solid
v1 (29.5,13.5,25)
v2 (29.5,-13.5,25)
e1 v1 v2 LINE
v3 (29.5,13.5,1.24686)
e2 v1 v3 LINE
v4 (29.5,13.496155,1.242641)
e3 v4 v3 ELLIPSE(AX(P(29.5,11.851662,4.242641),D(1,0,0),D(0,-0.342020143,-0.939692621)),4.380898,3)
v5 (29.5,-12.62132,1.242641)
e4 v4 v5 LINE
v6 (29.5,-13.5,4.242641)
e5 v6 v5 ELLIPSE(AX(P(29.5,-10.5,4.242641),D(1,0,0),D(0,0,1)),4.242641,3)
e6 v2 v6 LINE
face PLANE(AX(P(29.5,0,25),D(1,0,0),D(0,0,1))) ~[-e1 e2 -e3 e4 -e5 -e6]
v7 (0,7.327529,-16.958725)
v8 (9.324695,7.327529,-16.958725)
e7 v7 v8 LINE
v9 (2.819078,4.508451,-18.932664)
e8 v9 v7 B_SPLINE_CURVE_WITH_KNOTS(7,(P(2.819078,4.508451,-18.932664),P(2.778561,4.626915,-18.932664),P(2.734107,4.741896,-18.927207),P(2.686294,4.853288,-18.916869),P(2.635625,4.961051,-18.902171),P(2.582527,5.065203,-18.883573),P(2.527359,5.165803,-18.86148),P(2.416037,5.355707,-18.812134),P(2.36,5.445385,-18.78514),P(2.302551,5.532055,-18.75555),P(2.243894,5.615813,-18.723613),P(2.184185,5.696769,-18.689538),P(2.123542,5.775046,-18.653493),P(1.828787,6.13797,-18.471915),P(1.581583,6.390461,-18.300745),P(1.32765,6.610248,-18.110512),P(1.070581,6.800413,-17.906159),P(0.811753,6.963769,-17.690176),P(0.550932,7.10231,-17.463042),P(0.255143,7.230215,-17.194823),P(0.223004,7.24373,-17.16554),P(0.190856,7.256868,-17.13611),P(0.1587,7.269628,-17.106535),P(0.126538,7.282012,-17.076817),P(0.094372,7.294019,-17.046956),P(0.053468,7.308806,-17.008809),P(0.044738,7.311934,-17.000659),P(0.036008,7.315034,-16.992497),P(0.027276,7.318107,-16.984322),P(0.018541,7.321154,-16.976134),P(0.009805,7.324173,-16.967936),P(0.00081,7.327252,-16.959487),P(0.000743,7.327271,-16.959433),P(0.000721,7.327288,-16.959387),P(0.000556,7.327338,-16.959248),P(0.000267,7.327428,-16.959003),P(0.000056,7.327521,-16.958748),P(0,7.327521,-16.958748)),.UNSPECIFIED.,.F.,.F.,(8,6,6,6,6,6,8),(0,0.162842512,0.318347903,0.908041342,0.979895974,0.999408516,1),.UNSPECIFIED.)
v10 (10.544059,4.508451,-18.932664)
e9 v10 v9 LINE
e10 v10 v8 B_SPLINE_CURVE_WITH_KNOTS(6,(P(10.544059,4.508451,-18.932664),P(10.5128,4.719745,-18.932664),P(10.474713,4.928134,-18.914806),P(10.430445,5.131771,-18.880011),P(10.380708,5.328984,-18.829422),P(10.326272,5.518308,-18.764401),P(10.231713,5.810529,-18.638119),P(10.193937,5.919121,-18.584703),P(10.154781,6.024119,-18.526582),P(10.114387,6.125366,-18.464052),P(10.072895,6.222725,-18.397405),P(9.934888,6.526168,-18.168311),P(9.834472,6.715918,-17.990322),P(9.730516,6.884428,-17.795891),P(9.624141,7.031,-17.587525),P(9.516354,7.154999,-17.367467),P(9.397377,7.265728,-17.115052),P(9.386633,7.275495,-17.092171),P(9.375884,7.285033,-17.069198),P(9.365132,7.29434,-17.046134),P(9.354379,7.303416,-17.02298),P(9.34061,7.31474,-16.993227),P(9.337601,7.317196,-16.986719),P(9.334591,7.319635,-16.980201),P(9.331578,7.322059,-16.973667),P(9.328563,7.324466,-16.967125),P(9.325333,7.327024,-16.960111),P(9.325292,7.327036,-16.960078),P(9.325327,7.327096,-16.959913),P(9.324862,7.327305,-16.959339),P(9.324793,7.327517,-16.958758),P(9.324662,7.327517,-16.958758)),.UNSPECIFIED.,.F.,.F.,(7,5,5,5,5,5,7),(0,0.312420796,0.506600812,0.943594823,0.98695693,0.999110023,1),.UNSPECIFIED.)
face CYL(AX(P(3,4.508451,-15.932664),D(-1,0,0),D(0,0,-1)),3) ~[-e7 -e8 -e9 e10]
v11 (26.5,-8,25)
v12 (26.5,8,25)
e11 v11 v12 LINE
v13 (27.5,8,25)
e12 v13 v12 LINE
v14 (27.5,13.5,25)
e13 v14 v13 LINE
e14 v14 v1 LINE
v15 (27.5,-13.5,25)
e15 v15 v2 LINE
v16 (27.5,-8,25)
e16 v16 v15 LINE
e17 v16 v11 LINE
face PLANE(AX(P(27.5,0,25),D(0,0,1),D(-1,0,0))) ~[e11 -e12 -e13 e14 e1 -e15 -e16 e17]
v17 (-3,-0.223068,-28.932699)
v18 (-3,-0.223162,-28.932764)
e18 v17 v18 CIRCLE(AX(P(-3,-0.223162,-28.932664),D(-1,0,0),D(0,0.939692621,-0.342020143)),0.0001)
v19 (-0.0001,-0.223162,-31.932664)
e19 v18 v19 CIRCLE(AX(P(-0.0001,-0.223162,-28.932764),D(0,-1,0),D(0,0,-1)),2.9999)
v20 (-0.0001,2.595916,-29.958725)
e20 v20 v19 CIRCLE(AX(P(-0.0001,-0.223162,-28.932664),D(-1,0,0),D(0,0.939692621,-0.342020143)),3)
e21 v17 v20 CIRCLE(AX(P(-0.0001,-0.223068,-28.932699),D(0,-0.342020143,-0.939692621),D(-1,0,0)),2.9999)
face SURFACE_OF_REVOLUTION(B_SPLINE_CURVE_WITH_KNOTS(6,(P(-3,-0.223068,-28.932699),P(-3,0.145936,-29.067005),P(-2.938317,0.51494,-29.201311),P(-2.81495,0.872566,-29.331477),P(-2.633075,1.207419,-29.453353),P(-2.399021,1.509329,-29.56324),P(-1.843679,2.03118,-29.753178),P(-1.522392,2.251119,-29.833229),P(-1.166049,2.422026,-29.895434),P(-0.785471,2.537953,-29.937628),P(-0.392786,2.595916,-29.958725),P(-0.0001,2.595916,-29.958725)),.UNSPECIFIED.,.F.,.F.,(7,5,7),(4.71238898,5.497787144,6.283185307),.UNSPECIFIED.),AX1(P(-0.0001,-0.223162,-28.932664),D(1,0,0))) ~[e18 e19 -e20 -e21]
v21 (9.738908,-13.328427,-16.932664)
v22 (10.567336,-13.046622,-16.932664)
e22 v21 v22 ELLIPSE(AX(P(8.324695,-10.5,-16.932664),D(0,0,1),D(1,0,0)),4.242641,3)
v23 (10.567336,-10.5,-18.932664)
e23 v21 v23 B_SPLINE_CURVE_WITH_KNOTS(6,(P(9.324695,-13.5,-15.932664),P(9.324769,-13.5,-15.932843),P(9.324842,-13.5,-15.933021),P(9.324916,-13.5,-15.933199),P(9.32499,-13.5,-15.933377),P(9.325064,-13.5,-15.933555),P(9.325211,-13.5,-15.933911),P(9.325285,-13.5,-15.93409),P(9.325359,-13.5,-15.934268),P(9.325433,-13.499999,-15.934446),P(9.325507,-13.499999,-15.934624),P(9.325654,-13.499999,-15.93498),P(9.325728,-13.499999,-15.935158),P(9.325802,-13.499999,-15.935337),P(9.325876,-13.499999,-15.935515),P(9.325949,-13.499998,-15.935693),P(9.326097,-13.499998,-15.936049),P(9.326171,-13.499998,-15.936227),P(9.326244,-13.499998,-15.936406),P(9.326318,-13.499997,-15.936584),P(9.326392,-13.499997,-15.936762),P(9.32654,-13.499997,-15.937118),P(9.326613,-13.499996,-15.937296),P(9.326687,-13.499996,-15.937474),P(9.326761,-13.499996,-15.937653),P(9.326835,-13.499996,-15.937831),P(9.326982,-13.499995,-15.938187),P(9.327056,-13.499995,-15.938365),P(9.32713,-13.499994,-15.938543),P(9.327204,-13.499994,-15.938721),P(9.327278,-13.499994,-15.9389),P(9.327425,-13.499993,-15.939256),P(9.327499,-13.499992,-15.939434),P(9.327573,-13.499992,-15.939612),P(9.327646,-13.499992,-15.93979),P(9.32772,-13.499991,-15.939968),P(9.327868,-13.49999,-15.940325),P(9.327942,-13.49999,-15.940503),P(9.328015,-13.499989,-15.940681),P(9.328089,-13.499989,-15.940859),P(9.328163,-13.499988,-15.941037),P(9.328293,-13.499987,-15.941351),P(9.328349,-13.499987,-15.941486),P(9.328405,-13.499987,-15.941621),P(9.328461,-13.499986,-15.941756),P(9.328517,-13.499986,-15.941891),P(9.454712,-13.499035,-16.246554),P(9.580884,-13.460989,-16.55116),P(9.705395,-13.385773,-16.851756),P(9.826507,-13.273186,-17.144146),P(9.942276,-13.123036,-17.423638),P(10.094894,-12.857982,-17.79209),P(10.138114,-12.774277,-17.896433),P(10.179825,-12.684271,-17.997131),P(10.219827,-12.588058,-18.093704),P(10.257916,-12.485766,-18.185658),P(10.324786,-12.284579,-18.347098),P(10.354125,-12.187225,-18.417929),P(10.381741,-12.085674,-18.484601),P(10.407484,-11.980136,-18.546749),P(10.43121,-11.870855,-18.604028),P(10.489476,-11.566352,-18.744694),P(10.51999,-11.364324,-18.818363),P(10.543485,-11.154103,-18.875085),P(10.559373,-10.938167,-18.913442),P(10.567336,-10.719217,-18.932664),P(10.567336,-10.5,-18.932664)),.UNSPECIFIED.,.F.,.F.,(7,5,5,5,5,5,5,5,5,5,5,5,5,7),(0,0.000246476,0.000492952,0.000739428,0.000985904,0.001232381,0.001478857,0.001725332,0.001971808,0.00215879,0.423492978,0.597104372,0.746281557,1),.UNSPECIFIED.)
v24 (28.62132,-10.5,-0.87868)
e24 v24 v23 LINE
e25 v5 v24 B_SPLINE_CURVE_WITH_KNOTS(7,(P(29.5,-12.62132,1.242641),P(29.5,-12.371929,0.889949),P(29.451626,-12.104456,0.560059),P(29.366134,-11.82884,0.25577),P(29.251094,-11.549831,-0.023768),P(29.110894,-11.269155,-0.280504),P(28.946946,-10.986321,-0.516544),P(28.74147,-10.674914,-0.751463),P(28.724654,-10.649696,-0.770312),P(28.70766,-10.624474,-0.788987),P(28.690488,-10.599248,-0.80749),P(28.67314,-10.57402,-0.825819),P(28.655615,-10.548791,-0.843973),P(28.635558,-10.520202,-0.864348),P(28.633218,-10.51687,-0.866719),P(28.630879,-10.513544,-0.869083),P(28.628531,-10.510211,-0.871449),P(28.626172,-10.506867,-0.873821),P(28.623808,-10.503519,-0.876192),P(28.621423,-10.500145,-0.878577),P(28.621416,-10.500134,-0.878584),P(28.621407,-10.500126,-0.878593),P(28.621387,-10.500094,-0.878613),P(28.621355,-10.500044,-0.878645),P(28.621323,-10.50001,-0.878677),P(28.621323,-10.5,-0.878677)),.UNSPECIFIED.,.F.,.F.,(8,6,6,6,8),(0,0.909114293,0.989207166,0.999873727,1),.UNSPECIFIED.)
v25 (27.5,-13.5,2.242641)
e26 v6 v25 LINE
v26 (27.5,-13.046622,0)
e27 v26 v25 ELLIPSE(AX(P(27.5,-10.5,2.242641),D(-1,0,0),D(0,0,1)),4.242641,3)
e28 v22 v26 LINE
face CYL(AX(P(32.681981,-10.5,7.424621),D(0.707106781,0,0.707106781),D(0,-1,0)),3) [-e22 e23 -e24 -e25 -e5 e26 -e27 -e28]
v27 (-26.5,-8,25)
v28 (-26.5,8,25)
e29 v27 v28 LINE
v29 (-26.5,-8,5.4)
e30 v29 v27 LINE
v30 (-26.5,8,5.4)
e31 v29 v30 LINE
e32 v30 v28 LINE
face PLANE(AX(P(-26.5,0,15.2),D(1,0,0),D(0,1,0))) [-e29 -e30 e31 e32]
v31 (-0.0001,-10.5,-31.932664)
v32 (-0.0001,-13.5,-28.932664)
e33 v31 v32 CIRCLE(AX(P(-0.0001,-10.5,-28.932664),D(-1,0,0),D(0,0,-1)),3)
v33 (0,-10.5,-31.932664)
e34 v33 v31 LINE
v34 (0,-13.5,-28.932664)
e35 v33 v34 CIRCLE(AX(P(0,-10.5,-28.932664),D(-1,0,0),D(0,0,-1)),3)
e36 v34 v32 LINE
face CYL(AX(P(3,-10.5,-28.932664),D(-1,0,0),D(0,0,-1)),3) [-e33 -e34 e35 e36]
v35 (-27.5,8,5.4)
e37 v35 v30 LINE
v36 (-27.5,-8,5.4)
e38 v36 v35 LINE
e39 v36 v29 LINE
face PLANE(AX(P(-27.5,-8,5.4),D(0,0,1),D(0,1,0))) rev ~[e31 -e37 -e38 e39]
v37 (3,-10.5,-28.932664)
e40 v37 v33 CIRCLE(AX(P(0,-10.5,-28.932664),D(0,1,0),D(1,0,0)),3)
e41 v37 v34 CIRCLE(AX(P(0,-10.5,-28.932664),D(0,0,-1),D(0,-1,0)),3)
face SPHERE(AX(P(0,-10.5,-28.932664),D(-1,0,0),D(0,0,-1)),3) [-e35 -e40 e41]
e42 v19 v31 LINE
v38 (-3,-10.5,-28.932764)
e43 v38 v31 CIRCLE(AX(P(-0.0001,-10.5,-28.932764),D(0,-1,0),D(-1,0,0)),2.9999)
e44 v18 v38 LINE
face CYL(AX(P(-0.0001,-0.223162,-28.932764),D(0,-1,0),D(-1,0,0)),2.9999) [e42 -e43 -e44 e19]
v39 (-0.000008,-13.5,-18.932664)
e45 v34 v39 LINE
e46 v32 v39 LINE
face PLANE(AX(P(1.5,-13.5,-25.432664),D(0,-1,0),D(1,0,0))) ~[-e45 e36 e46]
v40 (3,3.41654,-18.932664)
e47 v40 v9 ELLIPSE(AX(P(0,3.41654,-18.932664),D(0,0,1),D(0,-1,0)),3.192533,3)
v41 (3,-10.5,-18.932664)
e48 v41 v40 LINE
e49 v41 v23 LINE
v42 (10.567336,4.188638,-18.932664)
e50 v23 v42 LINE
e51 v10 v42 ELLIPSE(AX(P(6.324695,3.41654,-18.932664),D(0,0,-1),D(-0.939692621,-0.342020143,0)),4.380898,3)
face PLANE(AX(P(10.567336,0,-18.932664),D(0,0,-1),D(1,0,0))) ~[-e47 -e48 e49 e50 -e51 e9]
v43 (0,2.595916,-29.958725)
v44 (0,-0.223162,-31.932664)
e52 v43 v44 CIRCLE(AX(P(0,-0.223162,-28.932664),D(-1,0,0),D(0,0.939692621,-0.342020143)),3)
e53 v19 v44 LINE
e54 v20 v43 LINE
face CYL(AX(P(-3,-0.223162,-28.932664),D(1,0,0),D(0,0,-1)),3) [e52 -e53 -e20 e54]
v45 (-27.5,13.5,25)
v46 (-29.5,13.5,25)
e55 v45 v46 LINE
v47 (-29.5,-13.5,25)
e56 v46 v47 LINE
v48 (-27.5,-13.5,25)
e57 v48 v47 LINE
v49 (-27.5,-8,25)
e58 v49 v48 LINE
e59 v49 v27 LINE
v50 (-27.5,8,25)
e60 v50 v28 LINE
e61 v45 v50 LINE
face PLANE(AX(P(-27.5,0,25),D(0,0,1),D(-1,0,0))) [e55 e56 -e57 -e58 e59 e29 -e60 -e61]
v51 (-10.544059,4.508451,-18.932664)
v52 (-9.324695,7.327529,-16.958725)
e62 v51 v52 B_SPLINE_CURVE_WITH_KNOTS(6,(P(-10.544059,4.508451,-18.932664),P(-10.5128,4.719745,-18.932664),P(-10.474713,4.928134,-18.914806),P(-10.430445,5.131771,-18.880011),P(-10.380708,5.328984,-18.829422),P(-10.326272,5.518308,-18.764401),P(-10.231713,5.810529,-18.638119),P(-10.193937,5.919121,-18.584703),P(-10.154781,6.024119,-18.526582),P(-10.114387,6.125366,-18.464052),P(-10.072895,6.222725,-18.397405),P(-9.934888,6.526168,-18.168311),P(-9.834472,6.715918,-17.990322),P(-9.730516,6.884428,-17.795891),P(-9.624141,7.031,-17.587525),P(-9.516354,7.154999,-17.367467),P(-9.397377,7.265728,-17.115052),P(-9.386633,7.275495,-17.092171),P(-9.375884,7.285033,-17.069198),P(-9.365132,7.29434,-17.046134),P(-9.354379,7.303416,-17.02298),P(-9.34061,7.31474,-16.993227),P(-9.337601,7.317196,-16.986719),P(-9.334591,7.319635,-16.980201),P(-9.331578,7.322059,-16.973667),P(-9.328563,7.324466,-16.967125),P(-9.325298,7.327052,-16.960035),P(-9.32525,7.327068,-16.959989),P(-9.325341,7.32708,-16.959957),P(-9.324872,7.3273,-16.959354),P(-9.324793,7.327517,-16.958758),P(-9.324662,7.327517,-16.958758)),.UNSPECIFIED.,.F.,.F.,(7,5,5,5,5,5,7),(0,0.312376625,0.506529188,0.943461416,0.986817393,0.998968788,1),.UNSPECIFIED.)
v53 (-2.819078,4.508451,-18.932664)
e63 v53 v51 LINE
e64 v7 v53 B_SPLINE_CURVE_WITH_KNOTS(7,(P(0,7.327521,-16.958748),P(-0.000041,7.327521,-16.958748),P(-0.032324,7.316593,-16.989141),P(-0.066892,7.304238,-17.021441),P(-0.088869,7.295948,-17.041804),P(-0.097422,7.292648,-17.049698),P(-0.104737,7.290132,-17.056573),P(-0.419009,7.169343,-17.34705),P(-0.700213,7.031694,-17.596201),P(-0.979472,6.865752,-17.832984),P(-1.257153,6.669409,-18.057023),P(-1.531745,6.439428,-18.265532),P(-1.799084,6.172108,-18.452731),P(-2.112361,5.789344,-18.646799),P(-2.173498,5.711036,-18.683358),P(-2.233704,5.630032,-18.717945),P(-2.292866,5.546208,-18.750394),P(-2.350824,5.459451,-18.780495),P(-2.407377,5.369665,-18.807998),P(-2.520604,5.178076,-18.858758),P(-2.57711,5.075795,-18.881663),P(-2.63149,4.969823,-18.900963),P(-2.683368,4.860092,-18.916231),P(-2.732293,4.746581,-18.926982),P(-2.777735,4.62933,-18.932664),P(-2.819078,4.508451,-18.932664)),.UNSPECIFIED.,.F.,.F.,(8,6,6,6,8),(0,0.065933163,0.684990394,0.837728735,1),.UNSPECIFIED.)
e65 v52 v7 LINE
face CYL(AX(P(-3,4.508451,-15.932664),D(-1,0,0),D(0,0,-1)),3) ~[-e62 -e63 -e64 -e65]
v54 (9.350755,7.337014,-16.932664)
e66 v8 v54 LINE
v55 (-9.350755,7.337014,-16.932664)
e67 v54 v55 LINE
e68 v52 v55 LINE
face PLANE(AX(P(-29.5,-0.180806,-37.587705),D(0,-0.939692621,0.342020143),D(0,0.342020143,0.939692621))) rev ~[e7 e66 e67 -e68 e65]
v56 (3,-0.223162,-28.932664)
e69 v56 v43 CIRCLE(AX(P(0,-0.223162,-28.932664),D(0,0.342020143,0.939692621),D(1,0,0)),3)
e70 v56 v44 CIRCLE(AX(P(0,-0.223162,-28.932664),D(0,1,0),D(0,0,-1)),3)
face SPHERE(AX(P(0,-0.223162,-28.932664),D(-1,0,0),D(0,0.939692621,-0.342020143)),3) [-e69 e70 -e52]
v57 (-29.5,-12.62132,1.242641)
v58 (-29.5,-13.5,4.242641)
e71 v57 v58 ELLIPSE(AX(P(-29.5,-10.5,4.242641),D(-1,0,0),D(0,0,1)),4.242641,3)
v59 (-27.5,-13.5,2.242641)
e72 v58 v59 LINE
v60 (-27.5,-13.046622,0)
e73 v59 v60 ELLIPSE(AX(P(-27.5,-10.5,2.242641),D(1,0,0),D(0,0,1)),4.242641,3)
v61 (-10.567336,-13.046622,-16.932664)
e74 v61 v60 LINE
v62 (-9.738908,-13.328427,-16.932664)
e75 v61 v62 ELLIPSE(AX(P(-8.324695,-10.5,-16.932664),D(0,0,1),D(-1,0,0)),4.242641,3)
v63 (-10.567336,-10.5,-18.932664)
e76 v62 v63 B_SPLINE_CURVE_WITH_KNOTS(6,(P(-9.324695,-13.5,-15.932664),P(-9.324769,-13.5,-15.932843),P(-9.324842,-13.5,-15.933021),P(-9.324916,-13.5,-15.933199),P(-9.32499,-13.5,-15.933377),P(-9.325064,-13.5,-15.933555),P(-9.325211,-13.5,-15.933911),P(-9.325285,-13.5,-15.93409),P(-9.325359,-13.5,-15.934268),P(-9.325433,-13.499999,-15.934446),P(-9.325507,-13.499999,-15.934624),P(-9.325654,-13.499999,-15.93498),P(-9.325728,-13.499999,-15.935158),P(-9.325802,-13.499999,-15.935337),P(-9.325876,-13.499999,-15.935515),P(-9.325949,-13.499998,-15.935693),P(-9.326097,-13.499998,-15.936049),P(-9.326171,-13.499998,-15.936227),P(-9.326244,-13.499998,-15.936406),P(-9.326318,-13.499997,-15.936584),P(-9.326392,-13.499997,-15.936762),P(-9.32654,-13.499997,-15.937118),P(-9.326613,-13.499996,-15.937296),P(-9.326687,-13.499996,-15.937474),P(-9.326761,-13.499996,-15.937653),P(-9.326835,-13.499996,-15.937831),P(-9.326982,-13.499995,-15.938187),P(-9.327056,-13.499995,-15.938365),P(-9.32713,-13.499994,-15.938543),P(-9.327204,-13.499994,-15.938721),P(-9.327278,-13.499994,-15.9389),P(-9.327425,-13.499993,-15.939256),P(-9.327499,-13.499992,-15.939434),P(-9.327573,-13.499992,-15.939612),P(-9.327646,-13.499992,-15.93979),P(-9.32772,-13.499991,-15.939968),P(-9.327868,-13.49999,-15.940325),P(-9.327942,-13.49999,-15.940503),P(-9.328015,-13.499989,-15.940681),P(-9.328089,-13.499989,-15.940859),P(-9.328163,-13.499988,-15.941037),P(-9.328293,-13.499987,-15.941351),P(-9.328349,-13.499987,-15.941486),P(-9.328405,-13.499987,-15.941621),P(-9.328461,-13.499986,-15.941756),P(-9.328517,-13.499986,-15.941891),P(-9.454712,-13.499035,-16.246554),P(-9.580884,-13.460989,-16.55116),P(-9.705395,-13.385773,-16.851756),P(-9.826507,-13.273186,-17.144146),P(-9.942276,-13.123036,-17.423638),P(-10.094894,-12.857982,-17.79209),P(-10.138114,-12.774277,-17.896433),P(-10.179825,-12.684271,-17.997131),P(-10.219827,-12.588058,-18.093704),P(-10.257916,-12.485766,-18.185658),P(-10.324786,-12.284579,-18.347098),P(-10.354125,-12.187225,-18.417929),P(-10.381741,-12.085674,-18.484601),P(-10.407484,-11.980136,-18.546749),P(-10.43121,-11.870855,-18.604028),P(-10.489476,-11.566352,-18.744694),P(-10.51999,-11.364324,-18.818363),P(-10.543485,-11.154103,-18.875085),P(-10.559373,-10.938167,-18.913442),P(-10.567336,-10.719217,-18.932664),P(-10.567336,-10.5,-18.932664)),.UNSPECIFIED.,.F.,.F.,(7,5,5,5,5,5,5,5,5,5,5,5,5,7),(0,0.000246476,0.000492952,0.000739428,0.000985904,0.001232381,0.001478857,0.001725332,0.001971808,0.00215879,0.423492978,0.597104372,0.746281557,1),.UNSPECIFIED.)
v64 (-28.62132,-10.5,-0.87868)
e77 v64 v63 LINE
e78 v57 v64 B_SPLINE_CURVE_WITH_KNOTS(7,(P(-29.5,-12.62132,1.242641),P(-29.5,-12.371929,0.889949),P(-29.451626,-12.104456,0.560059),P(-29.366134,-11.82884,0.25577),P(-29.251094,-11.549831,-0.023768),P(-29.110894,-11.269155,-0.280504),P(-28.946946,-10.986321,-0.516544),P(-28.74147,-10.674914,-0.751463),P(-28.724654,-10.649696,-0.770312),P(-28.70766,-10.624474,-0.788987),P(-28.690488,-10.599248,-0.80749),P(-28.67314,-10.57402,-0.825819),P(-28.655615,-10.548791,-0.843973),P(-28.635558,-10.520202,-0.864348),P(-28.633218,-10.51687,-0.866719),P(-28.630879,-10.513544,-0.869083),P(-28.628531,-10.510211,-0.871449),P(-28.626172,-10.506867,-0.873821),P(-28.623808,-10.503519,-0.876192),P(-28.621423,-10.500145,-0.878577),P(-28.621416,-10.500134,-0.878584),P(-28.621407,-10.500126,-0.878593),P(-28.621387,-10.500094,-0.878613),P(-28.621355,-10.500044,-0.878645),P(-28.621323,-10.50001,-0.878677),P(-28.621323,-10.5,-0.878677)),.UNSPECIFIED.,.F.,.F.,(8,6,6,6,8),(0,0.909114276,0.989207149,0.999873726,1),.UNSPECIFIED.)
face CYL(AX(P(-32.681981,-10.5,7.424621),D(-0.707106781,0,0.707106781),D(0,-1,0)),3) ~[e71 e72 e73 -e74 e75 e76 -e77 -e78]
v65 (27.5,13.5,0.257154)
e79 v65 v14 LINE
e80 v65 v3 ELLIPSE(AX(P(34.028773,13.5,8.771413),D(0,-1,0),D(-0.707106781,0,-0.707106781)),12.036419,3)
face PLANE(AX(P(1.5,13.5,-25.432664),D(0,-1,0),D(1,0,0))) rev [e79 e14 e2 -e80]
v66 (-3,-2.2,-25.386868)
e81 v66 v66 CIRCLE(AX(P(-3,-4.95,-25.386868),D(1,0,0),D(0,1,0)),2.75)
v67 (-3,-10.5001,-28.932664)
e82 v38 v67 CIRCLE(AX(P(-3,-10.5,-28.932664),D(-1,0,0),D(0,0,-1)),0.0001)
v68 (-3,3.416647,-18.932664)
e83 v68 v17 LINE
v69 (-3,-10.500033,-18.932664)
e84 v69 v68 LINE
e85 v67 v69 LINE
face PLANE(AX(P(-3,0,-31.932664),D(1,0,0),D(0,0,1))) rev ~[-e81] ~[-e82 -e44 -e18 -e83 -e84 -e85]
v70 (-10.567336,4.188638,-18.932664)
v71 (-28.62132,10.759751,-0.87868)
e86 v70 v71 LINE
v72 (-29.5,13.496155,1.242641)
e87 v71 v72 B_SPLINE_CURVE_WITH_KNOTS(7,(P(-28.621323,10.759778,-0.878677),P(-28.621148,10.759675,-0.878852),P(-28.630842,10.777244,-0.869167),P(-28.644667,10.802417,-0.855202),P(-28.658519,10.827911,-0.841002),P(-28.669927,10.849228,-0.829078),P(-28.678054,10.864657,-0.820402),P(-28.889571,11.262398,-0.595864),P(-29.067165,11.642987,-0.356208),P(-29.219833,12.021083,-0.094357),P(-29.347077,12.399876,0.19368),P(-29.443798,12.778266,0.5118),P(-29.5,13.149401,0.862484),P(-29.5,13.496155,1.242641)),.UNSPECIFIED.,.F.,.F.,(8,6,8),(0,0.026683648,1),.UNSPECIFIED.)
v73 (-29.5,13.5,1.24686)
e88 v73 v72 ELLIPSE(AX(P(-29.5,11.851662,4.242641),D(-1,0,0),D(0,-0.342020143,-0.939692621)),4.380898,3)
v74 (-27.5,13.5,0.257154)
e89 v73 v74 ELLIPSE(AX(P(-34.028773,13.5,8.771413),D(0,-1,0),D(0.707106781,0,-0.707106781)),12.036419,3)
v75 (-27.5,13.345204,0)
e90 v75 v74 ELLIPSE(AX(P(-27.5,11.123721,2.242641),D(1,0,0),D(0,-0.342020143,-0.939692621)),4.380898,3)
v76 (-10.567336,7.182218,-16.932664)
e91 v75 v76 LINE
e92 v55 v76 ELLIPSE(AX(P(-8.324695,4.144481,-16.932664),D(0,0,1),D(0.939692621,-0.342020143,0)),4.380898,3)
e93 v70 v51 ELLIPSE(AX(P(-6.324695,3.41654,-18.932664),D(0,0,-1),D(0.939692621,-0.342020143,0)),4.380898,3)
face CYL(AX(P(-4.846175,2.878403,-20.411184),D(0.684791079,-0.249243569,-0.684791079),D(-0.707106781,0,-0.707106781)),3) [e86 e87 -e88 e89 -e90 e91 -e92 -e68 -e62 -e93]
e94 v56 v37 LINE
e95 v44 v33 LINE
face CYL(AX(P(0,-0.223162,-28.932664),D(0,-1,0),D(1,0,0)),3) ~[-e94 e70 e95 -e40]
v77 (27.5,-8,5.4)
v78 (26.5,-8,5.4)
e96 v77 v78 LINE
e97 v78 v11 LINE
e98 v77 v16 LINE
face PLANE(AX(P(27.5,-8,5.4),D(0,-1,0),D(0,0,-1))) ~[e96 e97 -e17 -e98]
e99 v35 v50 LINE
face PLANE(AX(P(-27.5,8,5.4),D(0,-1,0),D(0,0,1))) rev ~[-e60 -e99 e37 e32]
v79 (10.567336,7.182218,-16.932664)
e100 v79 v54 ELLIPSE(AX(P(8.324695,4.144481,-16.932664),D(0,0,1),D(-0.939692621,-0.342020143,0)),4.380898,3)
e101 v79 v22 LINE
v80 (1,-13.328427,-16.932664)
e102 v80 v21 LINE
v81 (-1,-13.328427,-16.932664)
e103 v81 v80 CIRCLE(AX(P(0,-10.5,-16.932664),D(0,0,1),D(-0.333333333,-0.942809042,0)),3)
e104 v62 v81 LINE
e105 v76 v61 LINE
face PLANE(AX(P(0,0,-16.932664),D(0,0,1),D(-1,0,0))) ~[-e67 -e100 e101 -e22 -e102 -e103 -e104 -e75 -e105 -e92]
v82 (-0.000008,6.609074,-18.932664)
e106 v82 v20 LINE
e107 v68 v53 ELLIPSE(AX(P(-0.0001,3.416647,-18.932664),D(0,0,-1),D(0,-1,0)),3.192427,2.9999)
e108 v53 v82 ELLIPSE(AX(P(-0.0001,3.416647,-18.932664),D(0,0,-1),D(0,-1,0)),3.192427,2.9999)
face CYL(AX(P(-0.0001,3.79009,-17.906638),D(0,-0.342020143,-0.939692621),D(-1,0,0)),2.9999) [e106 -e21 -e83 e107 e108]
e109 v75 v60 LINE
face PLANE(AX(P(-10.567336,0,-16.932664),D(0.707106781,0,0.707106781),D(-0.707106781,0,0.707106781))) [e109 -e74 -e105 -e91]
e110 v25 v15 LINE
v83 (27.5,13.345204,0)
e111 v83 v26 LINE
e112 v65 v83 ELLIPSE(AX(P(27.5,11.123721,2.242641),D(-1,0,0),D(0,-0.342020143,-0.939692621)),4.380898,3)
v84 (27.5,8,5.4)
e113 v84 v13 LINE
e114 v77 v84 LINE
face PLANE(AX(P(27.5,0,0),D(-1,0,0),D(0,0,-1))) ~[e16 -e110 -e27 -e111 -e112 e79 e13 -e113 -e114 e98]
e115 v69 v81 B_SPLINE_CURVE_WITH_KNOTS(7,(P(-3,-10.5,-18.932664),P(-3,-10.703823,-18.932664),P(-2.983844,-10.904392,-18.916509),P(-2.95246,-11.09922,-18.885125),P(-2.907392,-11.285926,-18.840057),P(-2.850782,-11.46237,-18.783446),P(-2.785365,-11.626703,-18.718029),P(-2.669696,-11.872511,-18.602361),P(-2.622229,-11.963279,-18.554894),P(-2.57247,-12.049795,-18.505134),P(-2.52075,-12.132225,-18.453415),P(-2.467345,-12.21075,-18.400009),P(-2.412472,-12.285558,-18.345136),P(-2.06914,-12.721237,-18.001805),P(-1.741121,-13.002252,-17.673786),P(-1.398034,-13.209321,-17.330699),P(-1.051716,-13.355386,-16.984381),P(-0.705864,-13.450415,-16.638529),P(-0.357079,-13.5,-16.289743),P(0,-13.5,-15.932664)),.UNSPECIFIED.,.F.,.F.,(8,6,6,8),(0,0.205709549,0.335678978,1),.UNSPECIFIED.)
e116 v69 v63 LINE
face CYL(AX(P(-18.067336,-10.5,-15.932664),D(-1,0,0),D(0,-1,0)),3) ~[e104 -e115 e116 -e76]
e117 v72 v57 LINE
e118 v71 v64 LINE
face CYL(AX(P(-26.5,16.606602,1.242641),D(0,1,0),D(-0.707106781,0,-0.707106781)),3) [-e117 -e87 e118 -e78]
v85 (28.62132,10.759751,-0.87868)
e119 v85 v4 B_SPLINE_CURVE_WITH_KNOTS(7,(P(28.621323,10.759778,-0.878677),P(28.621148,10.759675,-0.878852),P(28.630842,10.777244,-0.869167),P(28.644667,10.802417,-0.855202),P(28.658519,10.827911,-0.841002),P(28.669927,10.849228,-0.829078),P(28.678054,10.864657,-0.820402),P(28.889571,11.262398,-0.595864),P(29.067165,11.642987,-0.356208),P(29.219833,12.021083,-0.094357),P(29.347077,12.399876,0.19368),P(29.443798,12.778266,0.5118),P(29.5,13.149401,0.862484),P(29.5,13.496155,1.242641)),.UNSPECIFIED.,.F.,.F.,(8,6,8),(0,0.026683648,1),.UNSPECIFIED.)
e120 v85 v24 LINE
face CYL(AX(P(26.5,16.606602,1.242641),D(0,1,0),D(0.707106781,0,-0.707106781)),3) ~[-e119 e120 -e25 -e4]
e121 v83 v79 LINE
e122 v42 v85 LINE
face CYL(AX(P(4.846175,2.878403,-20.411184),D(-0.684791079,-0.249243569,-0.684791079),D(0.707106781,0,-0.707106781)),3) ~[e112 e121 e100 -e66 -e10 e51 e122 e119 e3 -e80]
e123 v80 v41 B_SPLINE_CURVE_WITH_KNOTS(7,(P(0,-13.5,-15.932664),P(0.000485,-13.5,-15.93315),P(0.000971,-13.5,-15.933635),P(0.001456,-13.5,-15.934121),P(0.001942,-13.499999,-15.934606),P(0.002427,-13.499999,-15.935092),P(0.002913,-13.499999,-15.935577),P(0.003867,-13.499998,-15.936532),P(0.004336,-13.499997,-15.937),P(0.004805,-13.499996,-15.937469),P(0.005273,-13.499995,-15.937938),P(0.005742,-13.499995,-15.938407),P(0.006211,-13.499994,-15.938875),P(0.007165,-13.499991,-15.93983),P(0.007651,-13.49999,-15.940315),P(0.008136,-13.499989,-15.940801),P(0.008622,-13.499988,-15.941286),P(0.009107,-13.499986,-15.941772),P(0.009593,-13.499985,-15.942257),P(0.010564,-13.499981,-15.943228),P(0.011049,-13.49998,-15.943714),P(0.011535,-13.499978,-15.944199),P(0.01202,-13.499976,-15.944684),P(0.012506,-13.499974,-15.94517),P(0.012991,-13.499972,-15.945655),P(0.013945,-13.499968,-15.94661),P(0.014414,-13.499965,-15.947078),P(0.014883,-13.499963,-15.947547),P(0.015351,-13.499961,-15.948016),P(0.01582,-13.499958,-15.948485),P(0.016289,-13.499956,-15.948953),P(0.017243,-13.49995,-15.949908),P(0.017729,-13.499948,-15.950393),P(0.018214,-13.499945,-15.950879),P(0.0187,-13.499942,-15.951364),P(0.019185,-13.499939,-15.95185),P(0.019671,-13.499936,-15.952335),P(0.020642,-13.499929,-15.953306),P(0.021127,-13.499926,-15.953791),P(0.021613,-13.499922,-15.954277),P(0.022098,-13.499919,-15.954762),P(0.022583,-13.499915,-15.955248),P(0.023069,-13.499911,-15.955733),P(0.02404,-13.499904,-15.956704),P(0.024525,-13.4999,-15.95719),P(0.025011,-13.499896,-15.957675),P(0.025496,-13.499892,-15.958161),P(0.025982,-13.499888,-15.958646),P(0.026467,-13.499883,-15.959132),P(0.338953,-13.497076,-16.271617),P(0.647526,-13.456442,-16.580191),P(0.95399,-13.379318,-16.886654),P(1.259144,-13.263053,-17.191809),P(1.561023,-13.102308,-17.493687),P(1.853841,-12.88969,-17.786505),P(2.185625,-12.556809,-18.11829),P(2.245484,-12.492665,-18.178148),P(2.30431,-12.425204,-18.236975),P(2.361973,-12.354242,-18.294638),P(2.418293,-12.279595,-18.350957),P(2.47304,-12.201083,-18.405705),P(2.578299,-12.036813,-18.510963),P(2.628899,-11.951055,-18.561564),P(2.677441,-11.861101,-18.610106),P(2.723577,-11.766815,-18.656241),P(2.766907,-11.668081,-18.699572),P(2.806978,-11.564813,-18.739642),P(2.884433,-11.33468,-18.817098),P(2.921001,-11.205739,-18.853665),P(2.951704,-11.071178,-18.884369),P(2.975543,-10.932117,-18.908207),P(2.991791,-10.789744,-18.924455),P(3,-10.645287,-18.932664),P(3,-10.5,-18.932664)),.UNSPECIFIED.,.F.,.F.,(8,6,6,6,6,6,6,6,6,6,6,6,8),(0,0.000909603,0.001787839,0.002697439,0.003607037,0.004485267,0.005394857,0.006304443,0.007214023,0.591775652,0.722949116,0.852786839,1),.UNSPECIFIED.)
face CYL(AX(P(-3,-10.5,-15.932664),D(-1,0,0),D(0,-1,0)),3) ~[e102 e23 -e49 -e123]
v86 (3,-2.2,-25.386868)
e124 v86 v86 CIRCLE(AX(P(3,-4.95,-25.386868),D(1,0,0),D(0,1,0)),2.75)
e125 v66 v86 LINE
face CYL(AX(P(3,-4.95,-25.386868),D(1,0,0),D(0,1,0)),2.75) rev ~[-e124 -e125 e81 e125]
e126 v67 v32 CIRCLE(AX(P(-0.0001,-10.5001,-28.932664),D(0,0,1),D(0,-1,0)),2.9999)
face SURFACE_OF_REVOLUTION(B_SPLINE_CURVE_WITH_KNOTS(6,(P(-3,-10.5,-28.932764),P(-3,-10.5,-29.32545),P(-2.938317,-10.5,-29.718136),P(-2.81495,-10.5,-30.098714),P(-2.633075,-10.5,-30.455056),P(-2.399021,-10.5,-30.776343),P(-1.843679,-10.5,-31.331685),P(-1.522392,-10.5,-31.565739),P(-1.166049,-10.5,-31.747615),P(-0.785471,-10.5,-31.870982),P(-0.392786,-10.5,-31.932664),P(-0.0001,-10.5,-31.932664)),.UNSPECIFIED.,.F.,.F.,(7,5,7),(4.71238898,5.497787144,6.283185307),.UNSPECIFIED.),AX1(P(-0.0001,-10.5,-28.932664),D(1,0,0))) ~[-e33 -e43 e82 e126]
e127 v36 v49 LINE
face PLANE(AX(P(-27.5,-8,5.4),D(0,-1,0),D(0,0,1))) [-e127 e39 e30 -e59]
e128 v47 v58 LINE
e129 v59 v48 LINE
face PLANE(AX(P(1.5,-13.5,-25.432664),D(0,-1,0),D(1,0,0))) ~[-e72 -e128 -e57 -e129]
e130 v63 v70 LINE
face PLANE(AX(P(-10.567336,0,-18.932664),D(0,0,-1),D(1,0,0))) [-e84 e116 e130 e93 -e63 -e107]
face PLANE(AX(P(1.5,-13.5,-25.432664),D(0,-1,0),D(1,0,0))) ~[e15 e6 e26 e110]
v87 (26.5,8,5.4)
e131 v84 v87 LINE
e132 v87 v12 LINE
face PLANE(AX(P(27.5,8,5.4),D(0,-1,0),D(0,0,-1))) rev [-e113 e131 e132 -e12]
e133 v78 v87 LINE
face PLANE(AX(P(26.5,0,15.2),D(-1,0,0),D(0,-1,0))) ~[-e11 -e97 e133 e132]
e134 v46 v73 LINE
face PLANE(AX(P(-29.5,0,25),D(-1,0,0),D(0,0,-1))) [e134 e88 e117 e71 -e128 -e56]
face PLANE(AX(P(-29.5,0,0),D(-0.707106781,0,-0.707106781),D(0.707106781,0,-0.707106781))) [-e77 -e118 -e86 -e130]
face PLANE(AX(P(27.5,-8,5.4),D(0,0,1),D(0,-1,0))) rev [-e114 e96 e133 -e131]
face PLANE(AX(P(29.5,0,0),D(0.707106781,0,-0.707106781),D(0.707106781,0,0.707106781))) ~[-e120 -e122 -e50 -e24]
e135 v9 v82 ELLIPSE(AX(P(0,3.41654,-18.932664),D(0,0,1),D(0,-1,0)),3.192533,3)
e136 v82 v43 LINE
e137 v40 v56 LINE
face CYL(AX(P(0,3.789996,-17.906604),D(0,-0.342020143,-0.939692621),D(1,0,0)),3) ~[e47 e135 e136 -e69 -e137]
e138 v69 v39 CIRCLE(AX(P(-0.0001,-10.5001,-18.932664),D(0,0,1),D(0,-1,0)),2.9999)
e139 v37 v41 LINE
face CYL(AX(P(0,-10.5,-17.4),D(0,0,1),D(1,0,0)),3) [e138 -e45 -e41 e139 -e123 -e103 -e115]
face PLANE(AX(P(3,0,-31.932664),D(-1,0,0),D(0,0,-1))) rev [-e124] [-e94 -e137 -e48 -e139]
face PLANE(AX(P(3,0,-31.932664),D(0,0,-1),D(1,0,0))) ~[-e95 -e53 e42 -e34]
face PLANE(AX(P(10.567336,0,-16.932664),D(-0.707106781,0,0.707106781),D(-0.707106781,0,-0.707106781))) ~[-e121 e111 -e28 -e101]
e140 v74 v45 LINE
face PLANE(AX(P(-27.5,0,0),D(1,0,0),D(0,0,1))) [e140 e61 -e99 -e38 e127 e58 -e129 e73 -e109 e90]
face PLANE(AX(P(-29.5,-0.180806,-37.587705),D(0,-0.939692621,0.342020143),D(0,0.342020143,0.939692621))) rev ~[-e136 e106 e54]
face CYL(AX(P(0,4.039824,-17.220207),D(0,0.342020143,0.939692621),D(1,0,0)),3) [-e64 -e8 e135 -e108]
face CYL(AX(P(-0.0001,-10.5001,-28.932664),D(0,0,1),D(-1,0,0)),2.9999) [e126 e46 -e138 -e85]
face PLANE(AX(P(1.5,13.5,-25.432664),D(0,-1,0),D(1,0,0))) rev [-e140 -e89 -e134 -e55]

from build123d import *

# Parameters (mm, degrees)
F0_W          = 3
F0_H          = 13
F1_DEPTH      = 13.5
F2_W          = 16
F2_H          = 19.6
F3_DEPTH      = 1
F6_DEPTH      = 5000
F7_R          = 2.75
F8_DEPTH      = 50
F9_F1_R       = 3
F9_F2_R       = 3
F9_F3_R       = 3
F9_F4_R       = 2.9999
F10_T1_DEPTH  = 15.0673355609
F10_T3_DEPTH  = 15.0673355609
F10_T5_DEPTH  = 41.7748308216
F10_T7_DEPTH  = 41.7748308216
F10_T9_DEPTH  = 43.4696886285
F10_T11_DEPTH = 12.8188920975
F10_T13_DEPTH = 12.8188920975
F10_T15_DEPTH = 43.4696886285
F10_T17_DEPTH = 33.2132034356
F10_T22_DEPTH = 8.2514565366
F10_S23_R     = 3
F10_T24_DEPTH = 6
F10_T28_DEPTH = 8.2515565366
F10_S29_R     = 3
F10_T30_DEPTH = 6
F10_T34_DEPTH = 10.4999
F10_S35_R     = 3
F10_T36_DEPTH = 7
F10_T40_DEPTH = 10.5
F10_S41_R     = 3
F10_T42_DEPTH = 7


# Not quite as in the source:
# - a fillet or chamfer that OpenCascade refuses, or shapes differently, is made with other operations: its cross-section is extruded or revolved along the edge and cut away or added
# - a fillet or chamfer is up to 0.001 mm smaller than in the source, because OpenCascade refuses the exact size
# - a feature names something its author has since deleted; it is built from what else it names


with BuildPart() as f1:
    # F0 (on Front) → F1 (new body, symmetric)
    with BuildSketch(Plane.XZ):
        with Locations((-1.5, -25.4326644391)):
            Rectangle(F0_W, F0_H)
        Polygon((-10.5673355609, -16.9326644391), (-27.5, 0), (-27.5, 3.3434056677), (-27.5, 25), (-29.5, 25), (-29.5, 0), (-10.5673355609, -18.9326644391), (-3, -18.9326644391), (0, -18.9326644391), (0, -16.9326644391), align=None)
    extrude(amount=F1_DEPTH, both=True)

    # F2 (on face) → F3 (join)
    with BuildSketch(Plane.YZ.offset(-27.5)):
        with Locations((0, 15.2)):
            Rectangle(F2_W, F2_H)
    extrude(amount=F3_DEPTH)

    # F4: F1 across plane


with BuildPart() as f1_1:
    add(f1.part)
    add(f1.part.mirror(Plane.YZ))

    # F5 (on face) → F6 (cut, symmetric)
    with BuildSketch(Plane(origin=(-29.5, 0, 0), x_dir=(0, -1, 0), z_dir=(-1, 0, 0))):
        Polygon((-13.5, 0), (-21.2256871164, 0), (-25.0640398382, -39.3923101205), (-6.5540728933, -39.3923101205), (0.180805733, -37.5877048314), align=None)
    extrude(amount=F6_DEPTH, both=True, mode=Mode.SUBTRACT)

    # F7 (on face) → F8 (cut, symmetric)
    with BuildSketch(Plane.YZ.offset(3)):
        with Locations((-4.9499999732, -25.3868680447)):
            Circle(F7_R)
    extrude(amount=F8_DEPTH, both=True, mode=Mode.SUBTRACT)

    # F9: fillet of radius 3 on 4 edges, made by hand

    # F9_f1
    f9_f1_edges = [f1_1.edges().sort_by_distance(p)[0] for p in [
        (0, 1.8774606434, -31.9326644391),
    ]]
    fillet(f9_f1_edges, radius=F9_F1_R)

    # F9_f2
    f9_f2_edges = [f1_1.edges().sort_by_distance(p)[0] for p in [
        (0, -13.5, -31.9326644391),
    ]]
    fillet(f9_f2_edges, radius=F9_F2_R)

    # F9_f3
    f9_f3_edges = [f1_1.edges().sort_by_distance(p)[0] for p in [
        (3, -5.3615809856, -31.9326644391),
    ]]
    fillet(f9_f3_edges, radius=F9_F3_R)

    # F9_f4 (radius 3 in the source; OpenCascade refuses exactly that, so slightly less here)
    f9_f4_edges = [f1_1.edges().sort_by_distance(p)[0] for p in [
        (-3, -5.3615809856, -31.9326644391),
    ]]
    fillet(f9_f4_edges, radius=F9_F4_R)

    # F10: fillet of radius 3 on 12 edges, made by hand

    # F10_s2 → F10_t1 (cut)
    with BuildSketch(Plane.YZ.offset(3)):
        with BuildLine():
            ThreePointArc((-13.5, -15.9326644391), (-12.6213203436, -18.0539847826), (-10.5, -18.9326644391))
            Line((-10.5, -18.9326644391), (-13.5, -18.9326644391))
            Line((-13.5, -18.9326644391), (-13.5, -15.9326644391))
        make_face()
    extrude(amount=F10_T1_DEPTH, mode=Mode.SUBTRACT)

    # F10_s4 → F10_t3 (cut)
    with BuildSketch(Plane.YZ.offset(-18.0673355609)):
        with BuildLine():
            ThreePointArc((-13.5, -15.9326644391), (-12.6213203436, -18.0539847826), (-10.5, -18.9326644391))
            Line((-10.5, -18.9326644391), (-13.5, -18.9326644391))
            Line((-13.5, -18.9326644391), (-13.5, -15.9326644391))
        make_face()
    extrude(amount=F10_T3_DEPTH, mode=Mode.SUBTRACT)

    # F10_s6 → F10_t5 (cut)
    with BuildSketch(Plane(origin=(-20.0533008589, 0, 20.0533008589), x_dir=(0, 1, 0), z_dir=(0.7071067812, 0, -0.7071067812))):
        with BuildLine():
            ThreePointArc((-13.5, -17.859650045), (-12.6213203436, -19.9809703886), (-10.5, -20.859650045))
            Line((-10.5, -20.859650045), (-13.5, -20.859650045))
            Line((-13.5, -20.859650045), (-13.5, -17.859650045))
        make_face()
    extrude(amount=F10_T5_DEPTH, mode=Mode.SUBTRACT)

    # F10_s8 → F10_t7 (cut)
    with BuildSketch(Plane(origin=(20.0533008589, 0, 20.0533008589), x_dir=(0, 1, 0), z_dir=(-0.7071067812, 0, -0.7071067812))):
        with BuildLine():
            ThreePointArc((-13.5, 17.859650045), (-12.6213203436, 19.9809703886), (-10.5, 20.859650045))
            Line((-10.5, 20.859650045), (-13.5, 20.859650045))
            Line((-13.5, 20.859650045), (-13.5, 17.859650045))
        make_face()
    extrude(amount=F10_T7_DEPTH, mode=Mode.SUBTRACT)

    # F10_s10 → F10_t9 (cut)
    with BuildSketch(Plane(origin=(-6.8077517267, -2.4778189908, -6.8077517267), x_dir=(-0.3420201433, 0.9396926208, 0), z_dir=(0.6847910788, 0.2492435694, 0.6847910788))):
        with BuildLine():
            ThreePointArc((0.3217904404, -21.5780178201), (2.267861443, -21.4075638122), (3.6963913931, -20.0750664959))
            Line((3.6963913931, -20.0750664959), (2.5962561525, -22.1449137726))
            Line((2.5962561525, -22.1449137726), (0.3217904404, -21.5780178201))
        make_face()
    extrude(amount=F10_T9_DEPTH, mode=Mode.SUBTRACT)

    # F10_s12 → F10_t11 (cut)
    with BuildSketch(Plane.YZ.offset(3)):
        with BuildLine():
            ThreePointArc((4.5084510742, -18.9326644391), (6.2291803832, -18.3901205719), (7.3275289366, -16.9587248691))
            Line((7.3275289366, -16.9587248691), (6.6090736888, -18.9326644391))
            Line((6.6090736888, -18.9326644391), (4.5084510742, -18.9326644391))
        make_face()
    extrude(amount=F10_T11_DEPTH, mode=Mode.SUBTRACT)

    # F10_s14 → F10_t13 (cut)
    with BuildSketch(Plane.YZ.offset(-15.8188920975)):
        with BuildLine():
            ThreePointArc((4.5084510742, -18.9326644391), (6.2291803832, -18.3901205719), (7.3275289366, -16.9587248691))
            Line((7.3275289366, -16.9587248691), (6.6090736888, -18.9326644391))
            Line((6.6090736888, -18.9326644391), (4.5084510742, -18.9326644391))
        make_face()
    extrude(amount=F10_T13_DEPTH, mode=Mode.SUBTRACT)

    # F10_s16 → F10_t15 (cut)
    with BuildSketch(Plane(origin=(6.8077517267, -2.4778189908, -6.8077517267), x_dir=(-0.3420201433, -0.9396926208, 0), z_dir=(-0.6847910788, 0.2492435694, 0.6847910788))):
        with BuildLine():
            ThreePointArc((-0.3217904404, -21.5780178201), (-2.267861443, -21.4075638122), (-3.6963913931, -20.0750664959))
            Line((-3.6963913931, -20.0750664959), (-2.5962561525, -22.1449137726))
            Line((-2.5962561525, -22.1449137726), (-0.3217904404, -21.5780178201))
        make_face()
    extrude(amount=F10_T15_DEPTH, mode=Mode.SUBTRACT)

    # F10_s18 → F10_t17 (cut)
    with BuildSketch(Plane.XZ.offset(-16.6066017178)):
        with BuildLine():
            ThreePointArc((28.6213203436, -0.8786796564), (29.2716385975, 0.09459039), (29.5, 1.2426406871))
            Line((29.5, 1.2426406871), (29.5, 0))
            Line((29.5, 0), (28.6213203436, -0.8786796564))
        make_face()
        with BuildLine():
            ThreePointArc((-28.6213203436, -0.8786796564), (-29.2716385975, 0.09459039), (-29.5, 1.2426406871))
            Line((-29.5, 1.2426406871), (-29.5, 0))
            Line((-29.5, 0), (-28.6213203436, -0.8786796564))
        make_face()
    extrude(amount=F10_T17_DEPTH, mode=Mode.SUBTRACT)


with BuildPart() as f10_tool20:
    # F10_s21 → F10_t22 (new body)
    with BuildSketch(Plane.YZ.offset(-3)):
        with BuildLine():
            ThreePointArc((4.5084510742, -18.9326644391), (6.2291803832, -18.3901205719), (7.3275289366, -16.9587248691))
            Line((7.3275289366, -16.9587248691), (6.6090736888, -18.9326644391))
            Line((6.6090736888, -18.9326644391), (4.5084510742, -18.9326644391))
        make_face()
    extrude(amount=F10_T22_DEPTH)

    # F10_s23 → F10_t24 (cut, symmetric)
    with BuildSketch(Plane(origin=(0, -5.0618981212, -13.9074507876), x_dir=(1, 0, 0), z_dir=(0, 0.3420201433, 0.9396926208))):
        with Locations((0, 9.6858503806)):
            Circle(F10_S23_R)
    extrude(amount=F10_T24_DEPTH, both=True, mode=Mode.SUBTRACT)


with BuildPart() as f1_2:
    add(f1_1.part)

    # F10_t19: cut F10_tool20
    add(f10_tool20.part, mode=Mode.SUBTRACT)


with BuildPart() as f10_tool26:
    # F10_s27 → F10_t28 (new body)
    with BuildSketch(Plane.YZ.offset(3)):
        with BuildLine():
            ThreePointArc((4.5084510742, -18.9326644391), (6.2291803832, -18.3901205719), (7.3275289366, -16.9587248691))
            Line((7.3275289366, -16.9587248691), (6.6090736888, -18.9326644391))
            Line((6.6090736888, -18.9326644391), (4.5084510742, -18.9326644391))
        make_face()
    extrude(amount=-F10_T28_DEPTH)

    # F10_s29 → F10_t30 (cut, symmetric)
    with BuildSketch(Plane(origin=(0, -5.0618981212, -13.9074507876), x_dir=(1, 0, 0), z_dir=(0, 0.3420201433, 0.9396926208))):
        with Locations((0, 9.6858503806)):
            Circle(F10_S29_R)
    extrude(amount=F10_T30_DEPTH, both=True, mode=Mode.SUBTRACT)


with BuildPart() as f1_3:
    add(f1_2.part)

    # F10_t25: cut F10_tool26
    add(f10_tool26.part, mode=Mode.SUBTRACT)


with BuildPart() as f10_tool32:
    # F10_s33 → F10_t34 (new body)
    with BuildSketch(Plane.YZ.offset(-3)):
        with BuildLine():
            ThreePointArc((-13.5, -15.9326644391), (-12.6213203436, -18.0539847826), (-10.5, -18.9326644391))
            Line((-10.5, -18.9326644391), (-13.5, -18.9326644391))
            Line((-13.5, -18.9326644391), (-13.5, -15.9326644391))
        make_face()
    extrude(amount=F10_T34_DEPTH)

    # F10_s35 → F10_t36 (cut, symmetric)
    with BuildSketch(Plane.XY.offset(-17.4)):
        with Locations((0, -10.5)):
            Circle(F10_S35_R)
    extrude(amount=F10_T36_DEPTH, both=True, mode=Mode.SUBTRACT)


with BuildPart() as f1_4:
    add(f1_3.part)

    # F10_t31: cut F10_tool32
    add(f10_tool32.part, mode=Mode.SUBTRACT)


with BuildPart() as f10_tool38:
    # F10_s39 → F10_t40 (new body)
    with BuildSketch(Plane.YZ.offset(3)):
        with BuildLine():
            ThreePointArc((-13.5, -15.9326644391), (-12.6213203436, -18.0539847826), (-10.5, -18.9326644391))
            Line((-10.5, -18.9326644391), (-13.5, -18.9326644391))
            Line((-13.5, -18.9326644391), (-13.5, -15.9326644391))
        make_face()
    extrude(amount=-F10_T40_DEPTH)

    # F10_s41 → F10_t42 (cut, symmetric)
    with BuildSketch(Plane.XY.offset(-17.4)):
        with Locations((0, -10.5)):
            Circle(F10_S41_R)
    extrude(amount=F10_T42_DEPTH, both=True, mode=Mode.SUBTRACT)


with BuildPart() as f1_5:
    add(f1_4.part)

    # F10_t37: cut F10_tool38
    add(f10_tool38.part, mode=Mode.SUBTRACT)


solid = f1_5.part
